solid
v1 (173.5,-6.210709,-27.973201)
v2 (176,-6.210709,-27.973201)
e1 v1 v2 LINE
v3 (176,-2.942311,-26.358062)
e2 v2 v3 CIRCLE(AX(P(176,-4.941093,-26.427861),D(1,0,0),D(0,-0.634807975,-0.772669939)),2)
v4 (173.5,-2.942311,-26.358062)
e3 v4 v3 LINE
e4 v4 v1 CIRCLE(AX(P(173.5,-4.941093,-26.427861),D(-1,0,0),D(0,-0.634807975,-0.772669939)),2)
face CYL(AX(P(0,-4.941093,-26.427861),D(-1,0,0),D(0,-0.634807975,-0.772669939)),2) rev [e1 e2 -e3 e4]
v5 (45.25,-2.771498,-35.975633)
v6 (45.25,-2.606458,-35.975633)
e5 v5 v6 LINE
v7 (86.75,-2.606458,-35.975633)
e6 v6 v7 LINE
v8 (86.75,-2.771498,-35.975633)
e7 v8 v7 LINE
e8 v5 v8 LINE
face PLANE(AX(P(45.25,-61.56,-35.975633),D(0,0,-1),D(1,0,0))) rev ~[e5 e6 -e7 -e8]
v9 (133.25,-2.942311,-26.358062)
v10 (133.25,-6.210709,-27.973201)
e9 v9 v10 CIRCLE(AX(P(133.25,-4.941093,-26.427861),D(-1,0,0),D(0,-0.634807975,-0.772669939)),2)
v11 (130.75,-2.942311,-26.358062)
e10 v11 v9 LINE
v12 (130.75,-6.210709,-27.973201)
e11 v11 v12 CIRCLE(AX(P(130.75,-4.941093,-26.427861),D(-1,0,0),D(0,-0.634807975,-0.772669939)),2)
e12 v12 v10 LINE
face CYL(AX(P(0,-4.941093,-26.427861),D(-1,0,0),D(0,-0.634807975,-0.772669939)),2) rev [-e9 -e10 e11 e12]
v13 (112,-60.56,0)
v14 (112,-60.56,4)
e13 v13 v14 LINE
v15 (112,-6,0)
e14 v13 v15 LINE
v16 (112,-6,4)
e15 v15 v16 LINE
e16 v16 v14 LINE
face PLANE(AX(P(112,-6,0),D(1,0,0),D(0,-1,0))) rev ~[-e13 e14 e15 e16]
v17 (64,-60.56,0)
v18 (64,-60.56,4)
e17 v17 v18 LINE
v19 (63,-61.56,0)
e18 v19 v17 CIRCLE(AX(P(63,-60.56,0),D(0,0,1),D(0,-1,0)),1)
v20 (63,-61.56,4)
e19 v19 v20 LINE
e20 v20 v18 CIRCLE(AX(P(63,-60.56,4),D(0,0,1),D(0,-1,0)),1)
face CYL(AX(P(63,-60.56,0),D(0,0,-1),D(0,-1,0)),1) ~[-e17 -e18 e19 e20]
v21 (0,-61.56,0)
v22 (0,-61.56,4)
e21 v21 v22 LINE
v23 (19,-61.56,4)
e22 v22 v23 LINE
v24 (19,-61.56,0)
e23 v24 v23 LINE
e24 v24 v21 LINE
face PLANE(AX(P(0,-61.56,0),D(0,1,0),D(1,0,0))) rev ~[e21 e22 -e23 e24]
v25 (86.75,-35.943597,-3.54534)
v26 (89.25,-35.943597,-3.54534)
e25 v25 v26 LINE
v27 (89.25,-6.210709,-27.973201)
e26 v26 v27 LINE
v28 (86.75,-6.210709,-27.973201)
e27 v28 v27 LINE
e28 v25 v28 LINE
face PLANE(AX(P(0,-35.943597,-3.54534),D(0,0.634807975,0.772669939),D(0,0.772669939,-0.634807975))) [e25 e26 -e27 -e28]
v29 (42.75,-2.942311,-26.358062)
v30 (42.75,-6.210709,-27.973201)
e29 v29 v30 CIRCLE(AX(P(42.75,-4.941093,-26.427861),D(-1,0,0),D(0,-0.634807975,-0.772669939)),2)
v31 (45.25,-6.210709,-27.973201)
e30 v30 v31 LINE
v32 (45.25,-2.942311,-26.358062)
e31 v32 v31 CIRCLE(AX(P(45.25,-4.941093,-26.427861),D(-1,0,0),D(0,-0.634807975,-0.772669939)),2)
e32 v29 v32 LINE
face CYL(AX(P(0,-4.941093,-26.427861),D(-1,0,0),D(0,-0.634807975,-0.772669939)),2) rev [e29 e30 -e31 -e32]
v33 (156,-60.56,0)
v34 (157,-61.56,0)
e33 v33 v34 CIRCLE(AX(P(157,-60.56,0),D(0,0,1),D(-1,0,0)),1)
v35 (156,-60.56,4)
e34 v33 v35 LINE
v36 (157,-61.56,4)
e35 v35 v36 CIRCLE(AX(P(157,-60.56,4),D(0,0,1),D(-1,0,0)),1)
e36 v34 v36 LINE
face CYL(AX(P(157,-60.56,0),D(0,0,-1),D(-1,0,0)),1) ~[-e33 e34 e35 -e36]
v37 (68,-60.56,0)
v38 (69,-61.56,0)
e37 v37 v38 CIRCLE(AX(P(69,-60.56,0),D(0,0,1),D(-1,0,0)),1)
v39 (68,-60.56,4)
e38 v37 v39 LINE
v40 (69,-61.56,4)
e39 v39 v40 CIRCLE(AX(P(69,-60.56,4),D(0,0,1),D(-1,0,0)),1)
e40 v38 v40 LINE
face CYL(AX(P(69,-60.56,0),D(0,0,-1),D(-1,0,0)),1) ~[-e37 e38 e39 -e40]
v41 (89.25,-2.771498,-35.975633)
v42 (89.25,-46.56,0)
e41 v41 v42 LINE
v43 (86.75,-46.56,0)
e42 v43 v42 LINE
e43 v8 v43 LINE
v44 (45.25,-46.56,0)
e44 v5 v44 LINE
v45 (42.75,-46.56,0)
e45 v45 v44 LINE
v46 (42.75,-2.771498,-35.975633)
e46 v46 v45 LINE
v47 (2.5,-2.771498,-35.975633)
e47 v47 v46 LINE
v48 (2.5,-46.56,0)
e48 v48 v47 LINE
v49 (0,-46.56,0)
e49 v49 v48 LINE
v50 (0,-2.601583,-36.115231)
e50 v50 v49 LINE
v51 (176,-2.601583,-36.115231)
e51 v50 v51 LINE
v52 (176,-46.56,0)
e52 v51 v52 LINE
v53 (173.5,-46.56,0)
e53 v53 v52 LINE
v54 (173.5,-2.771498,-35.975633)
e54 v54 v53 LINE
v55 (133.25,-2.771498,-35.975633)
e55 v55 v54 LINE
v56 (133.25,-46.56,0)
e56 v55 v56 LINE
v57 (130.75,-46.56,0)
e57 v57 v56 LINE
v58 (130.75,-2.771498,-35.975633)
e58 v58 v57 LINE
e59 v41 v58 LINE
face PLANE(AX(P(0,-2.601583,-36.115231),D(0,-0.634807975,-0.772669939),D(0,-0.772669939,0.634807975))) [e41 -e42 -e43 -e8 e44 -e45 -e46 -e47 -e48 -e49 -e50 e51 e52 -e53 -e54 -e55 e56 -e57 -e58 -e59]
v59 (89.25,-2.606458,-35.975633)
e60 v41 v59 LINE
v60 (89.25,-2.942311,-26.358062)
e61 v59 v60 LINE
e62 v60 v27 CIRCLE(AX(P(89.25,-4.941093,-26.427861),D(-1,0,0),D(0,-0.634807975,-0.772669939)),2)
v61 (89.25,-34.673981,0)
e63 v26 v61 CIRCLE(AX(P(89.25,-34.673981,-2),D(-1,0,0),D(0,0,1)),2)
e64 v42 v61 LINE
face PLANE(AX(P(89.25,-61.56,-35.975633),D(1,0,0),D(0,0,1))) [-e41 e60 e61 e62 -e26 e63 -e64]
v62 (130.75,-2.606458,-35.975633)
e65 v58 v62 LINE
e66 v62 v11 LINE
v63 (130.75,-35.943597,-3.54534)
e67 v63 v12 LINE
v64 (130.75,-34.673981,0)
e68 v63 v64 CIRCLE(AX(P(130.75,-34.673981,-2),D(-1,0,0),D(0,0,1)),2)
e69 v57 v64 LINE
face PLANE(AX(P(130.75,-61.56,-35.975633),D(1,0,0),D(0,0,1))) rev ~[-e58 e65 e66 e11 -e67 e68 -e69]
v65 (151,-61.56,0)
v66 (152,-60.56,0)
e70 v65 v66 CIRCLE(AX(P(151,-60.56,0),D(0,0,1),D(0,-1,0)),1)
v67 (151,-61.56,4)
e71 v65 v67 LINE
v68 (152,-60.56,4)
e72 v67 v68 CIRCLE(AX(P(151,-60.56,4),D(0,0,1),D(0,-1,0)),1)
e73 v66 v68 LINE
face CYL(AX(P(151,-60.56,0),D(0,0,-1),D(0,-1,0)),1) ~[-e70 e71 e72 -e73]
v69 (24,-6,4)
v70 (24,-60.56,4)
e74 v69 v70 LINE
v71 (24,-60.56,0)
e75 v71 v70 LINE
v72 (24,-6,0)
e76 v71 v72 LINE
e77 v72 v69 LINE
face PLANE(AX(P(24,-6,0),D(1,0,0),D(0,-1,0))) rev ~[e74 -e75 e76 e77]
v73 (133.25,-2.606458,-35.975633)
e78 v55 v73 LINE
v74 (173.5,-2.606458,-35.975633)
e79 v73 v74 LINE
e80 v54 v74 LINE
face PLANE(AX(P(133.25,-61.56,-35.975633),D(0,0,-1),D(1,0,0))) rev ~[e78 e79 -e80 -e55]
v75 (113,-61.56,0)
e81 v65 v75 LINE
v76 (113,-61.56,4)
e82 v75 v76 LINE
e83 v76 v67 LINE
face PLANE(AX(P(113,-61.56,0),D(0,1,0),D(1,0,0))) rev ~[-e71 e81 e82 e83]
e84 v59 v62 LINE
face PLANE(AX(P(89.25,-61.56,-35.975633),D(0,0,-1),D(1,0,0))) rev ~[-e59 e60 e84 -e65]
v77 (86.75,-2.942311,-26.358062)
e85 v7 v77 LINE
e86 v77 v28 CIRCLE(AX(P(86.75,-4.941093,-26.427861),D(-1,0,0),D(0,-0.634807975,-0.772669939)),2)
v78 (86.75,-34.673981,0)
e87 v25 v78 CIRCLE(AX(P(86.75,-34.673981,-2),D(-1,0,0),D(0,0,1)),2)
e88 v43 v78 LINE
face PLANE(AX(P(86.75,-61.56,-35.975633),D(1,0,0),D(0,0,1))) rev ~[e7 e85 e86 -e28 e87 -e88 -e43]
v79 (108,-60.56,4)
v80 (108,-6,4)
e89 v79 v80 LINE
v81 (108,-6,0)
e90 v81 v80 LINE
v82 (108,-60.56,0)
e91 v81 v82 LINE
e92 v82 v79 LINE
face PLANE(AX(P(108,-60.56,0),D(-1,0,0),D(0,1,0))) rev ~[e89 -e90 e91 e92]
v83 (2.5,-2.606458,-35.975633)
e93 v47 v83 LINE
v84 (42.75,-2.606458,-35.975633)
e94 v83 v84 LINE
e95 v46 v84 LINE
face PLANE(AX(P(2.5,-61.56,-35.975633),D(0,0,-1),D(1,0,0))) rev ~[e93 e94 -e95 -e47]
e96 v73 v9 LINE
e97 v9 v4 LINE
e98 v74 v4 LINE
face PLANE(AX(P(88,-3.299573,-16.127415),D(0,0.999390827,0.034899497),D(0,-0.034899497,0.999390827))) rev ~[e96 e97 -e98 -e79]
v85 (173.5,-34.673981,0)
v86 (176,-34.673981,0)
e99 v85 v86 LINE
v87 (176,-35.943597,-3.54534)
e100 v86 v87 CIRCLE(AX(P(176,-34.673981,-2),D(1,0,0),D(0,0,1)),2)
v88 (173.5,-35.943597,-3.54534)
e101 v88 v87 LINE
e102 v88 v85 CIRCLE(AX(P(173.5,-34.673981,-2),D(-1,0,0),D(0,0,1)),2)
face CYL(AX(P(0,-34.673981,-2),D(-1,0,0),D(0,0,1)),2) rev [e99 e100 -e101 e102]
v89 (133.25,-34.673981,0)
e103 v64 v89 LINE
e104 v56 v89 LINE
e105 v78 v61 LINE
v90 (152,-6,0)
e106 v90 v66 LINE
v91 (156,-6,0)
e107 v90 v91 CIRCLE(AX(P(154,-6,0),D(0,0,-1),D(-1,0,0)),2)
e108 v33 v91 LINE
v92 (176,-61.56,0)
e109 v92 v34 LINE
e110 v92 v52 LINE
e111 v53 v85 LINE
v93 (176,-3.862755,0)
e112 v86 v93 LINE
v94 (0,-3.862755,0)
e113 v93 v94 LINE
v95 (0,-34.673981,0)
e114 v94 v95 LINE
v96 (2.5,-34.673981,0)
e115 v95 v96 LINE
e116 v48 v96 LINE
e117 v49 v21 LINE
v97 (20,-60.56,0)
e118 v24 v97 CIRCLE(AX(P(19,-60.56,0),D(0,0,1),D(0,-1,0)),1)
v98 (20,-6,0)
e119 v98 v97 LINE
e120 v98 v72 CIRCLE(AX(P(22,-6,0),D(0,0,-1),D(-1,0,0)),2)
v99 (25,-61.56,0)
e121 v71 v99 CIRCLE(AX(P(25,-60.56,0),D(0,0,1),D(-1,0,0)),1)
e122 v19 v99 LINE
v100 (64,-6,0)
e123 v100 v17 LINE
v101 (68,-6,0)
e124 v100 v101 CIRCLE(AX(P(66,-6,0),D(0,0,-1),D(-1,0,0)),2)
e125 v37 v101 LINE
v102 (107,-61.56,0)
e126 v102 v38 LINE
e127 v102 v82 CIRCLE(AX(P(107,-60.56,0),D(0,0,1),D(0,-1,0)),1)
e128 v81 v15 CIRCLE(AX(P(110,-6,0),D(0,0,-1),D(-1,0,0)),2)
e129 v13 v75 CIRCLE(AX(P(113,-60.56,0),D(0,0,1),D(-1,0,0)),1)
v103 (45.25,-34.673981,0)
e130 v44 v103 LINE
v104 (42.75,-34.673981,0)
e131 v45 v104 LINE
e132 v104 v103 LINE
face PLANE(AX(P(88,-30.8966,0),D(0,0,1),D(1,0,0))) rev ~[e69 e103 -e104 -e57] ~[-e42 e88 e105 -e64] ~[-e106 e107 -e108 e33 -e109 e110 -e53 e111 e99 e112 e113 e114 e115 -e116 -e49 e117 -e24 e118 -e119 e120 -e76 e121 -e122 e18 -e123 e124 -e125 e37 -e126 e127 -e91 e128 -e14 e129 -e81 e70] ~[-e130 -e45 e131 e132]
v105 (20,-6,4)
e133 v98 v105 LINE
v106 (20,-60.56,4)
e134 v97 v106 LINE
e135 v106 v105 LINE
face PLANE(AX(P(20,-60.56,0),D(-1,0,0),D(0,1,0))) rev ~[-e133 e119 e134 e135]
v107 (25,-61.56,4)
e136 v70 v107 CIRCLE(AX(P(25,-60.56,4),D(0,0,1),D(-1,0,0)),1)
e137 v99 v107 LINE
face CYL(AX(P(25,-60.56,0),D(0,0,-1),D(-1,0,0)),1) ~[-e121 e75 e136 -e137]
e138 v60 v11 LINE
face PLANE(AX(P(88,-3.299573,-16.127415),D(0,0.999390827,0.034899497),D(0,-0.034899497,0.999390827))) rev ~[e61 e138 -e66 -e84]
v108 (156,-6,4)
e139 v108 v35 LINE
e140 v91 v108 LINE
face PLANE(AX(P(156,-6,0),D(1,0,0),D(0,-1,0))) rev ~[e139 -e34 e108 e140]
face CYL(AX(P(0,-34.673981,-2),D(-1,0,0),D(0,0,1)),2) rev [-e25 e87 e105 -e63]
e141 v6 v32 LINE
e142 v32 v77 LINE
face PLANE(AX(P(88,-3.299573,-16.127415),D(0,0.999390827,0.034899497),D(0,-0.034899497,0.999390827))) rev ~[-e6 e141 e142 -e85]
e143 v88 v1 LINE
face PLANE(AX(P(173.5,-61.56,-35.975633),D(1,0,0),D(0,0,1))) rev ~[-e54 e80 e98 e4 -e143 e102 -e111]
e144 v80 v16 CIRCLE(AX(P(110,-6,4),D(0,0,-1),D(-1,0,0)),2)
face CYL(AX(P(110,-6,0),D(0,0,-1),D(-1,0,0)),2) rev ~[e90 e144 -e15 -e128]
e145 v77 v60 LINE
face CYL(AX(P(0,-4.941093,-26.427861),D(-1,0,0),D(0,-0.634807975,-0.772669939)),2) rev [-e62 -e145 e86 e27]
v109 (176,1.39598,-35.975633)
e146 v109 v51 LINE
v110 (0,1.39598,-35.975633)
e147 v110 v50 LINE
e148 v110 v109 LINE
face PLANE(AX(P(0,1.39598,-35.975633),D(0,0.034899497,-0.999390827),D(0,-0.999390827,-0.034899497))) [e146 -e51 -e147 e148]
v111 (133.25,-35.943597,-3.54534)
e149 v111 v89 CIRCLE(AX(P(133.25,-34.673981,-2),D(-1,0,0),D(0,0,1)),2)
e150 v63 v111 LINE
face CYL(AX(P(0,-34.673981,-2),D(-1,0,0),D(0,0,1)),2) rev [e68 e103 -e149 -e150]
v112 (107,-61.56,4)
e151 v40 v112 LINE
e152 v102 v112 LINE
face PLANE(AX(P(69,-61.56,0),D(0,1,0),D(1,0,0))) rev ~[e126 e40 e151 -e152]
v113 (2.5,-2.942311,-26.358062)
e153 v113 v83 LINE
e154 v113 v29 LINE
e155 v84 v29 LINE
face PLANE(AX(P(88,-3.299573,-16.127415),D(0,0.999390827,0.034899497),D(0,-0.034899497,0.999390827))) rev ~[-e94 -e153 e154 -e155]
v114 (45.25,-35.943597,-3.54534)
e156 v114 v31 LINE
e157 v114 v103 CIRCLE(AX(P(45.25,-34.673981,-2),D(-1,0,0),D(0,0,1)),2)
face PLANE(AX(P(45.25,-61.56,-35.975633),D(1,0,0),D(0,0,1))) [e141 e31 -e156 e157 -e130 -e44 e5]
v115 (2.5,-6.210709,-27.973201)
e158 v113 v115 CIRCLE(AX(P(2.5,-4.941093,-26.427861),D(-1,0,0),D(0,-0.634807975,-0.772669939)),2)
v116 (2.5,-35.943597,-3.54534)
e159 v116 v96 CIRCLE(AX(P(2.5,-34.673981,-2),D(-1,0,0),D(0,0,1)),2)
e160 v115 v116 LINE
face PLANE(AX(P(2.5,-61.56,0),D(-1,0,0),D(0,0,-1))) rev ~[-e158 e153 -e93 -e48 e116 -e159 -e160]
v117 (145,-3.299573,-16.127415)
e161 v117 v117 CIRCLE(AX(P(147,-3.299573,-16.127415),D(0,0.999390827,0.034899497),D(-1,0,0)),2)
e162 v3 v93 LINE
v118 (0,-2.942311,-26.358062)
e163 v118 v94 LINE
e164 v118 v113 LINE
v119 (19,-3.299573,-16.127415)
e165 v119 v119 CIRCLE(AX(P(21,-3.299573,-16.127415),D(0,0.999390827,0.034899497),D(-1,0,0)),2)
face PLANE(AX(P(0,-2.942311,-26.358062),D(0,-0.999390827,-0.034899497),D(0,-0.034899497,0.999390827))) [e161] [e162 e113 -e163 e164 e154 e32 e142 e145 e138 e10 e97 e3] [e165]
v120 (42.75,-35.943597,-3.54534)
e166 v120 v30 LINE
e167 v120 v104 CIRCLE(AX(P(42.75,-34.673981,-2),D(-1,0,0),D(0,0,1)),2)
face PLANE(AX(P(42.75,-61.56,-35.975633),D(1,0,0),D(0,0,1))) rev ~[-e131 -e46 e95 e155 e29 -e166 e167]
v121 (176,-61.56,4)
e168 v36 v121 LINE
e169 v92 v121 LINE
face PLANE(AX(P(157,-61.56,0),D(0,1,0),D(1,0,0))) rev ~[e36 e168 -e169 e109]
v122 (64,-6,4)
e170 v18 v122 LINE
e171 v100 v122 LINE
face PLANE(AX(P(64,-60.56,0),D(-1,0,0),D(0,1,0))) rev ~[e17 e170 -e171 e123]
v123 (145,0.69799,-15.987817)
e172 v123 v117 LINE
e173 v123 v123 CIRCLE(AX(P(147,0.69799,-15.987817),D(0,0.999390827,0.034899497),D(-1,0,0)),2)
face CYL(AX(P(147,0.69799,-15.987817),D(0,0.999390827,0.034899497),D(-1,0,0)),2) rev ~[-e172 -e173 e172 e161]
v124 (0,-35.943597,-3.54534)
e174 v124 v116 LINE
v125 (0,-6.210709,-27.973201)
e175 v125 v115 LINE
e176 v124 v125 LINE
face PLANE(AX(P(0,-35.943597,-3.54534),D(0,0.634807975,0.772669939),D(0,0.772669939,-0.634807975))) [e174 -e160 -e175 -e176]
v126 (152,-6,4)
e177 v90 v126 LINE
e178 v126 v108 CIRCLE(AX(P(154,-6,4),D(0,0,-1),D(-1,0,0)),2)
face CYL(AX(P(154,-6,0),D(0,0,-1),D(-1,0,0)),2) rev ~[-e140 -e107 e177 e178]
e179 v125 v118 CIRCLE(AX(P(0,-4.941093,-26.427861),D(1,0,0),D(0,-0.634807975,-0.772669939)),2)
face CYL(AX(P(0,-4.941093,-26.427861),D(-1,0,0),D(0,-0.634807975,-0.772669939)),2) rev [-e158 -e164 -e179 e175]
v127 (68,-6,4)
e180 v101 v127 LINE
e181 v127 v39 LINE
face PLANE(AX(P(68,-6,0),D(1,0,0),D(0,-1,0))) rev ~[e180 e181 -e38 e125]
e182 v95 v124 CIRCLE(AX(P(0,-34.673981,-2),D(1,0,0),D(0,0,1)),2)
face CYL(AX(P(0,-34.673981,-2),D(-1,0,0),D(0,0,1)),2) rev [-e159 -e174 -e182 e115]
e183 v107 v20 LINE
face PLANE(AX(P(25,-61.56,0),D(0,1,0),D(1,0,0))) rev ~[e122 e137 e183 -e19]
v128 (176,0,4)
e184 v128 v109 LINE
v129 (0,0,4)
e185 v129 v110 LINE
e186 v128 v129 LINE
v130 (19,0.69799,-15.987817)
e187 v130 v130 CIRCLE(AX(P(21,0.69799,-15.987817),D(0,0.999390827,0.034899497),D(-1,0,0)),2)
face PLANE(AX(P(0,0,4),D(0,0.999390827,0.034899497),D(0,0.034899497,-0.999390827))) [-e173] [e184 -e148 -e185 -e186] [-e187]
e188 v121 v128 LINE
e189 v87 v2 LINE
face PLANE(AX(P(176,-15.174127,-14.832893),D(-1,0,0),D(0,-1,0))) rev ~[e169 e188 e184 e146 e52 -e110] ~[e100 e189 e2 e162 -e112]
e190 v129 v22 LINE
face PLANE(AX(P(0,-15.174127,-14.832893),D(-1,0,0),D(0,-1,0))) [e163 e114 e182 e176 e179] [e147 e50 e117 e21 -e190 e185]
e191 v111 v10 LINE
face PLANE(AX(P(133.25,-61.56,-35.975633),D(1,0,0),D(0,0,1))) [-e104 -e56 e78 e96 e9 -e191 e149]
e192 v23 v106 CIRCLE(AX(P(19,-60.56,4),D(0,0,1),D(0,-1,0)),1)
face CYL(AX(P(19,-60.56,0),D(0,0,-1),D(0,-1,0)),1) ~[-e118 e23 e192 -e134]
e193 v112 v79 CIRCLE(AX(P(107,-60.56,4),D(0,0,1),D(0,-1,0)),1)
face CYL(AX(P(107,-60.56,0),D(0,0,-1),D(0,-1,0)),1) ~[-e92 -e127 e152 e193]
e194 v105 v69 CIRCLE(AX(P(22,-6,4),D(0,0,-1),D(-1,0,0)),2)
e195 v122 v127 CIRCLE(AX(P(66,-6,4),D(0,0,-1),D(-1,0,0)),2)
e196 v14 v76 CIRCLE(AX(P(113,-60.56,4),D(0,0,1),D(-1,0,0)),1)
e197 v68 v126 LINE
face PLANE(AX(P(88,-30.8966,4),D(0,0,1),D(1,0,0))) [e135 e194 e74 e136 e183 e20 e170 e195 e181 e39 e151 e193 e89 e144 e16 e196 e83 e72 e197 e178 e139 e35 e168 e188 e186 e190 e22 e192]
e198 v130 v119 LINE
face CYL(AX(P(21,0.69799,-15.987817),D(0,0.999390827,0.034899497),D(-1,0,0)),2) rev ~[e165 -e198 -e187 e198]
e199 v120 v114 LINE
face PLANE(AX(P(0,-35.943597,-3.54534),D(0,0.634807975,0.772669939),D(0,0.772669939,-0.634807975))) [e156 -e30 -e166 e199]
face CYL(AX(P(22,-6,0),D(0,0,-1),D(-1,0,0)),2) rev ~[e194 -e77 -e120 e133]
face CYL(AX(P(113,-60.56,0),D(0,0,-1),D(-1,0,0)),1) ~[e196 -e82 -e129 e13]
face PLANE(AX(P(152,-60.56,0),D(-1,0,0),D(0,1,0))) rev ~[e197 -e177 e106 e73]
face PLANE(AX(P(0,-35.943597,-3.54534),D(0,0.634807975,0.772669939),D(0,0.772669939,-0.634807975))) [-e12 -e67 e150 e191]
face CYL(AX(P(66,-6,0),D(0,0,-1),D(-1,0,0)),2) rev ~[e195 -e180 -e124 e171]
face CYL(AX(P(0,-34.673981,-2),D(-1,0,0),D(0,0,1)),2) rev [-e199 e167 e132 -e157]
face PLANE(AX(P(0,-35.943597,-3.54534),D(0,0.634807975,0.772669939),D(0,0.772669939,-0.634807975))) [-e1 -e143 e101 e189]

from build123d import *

# Parameters (mm, degrees)
F1_DEPTH = 4
F4_DEPTH = 176
F6_W     = 40.25
F6_H     = 35.9756330808
F6_W_2   = 41.5
F7_REACH = 113.8761797882
F8_R     = 2
F9_DEPTH = 25


# Not quite as in the source:
# - a feature names something its author has since deleted; it is built from what else it names


with BuildPart() as f1:
    # F0 (on Top) → F1 (new body)
    with BuildSketch(Plane.XY):
        with BuildLine():
            Line((176, 0), (0, 0))
            Line((0, 0), (0, -61.56))
            Line((0, -61.56), (19, -61.56))
            ThreePointArc((19, -61.56), (19.7071067812, -61.2671067812), (20, -60.56))
            Line((20, -60.56), (20, -6))
            ThreePointArc((20, -6), (22, -4), (24, -6))
            Line((24, -6), (24, -60.56))
            ThreePointArc((24, -60.56), (24.2928932188, -61.2671067812), (25, -61.56))
            Line((25, -61.56), (63, -61.56))
            ThreePointArc((63, -61.56), (63.7071067812, -61.2671067812), (64, -60.56))
            Line((64, -60.56), (64, -6))
            ThreePointArc((64, -6), (66, -4), (68, -6))
            Line((68, -6), (68, -60.56))
            ThreePointArc((68, -60.56), (68.2928932188, -61.2671067812), (69, -61.56))
            Line((69, -61.56), (107, -61.56))
            ThreePointArc((107, -61.56), (107.7071067812, -61.2671067812), (108, -60.56))
            Line((108, -60.56), (108, -6))
            ThreePointArc((108, -6), (110, -4), (112, -6))
            Line((112, -6), (112, -60.56))
            ThreePointArc((112, -60.56), (112.2928932188, -61.2671067812), (113, -61.56))
            Line((113, -61.56), (151, -61.56))
            ThreePointArc((151, -61.56), (151.7071067812, -61.2671067812), (152, -60.56))
            Line((152, -60.56), (152, -6))
            ThreePointArc((152, -6), (154, -4), (156, -6))
            Line((156, -6), (156, -60.56))
            ThreePointArc((156, -60.56), (156.2928932188, -61.2671067812), (157, -61.56))
            Line((157, -61.56), (176, -61.56))
            Line((176, -61.56), (176, 0))
        make_face()
    extrude(amount=F1_DEPTH)

    # F3 (on face) → F4 (join, through all)
    with BuildSketch(Plane(origin=(0, 0, 0), x_dir=(0, -1, 0), z_dir=(-1, 0, 0))):
        with BuildLine():
            Line((2.9423112754, -26.3580624732), (3.8627550992, 0))
            Line((3.8627550992, 0), (0, 0))
            Line((0, 0), (0, 4))
            Line((0, 4), (-1.3959798681, -35.9756330808))
            Line((-1.3959798681, -35.9756330808), (2.60158344, -36.1152310676))
            Line((2.60158344, -36.1152310676), (46.56, 0))
            Line((46.56, 0), (34.6739806412, 0))
            ThreePointArc((34.6739806412, 0), (36.5568879354, -1.3257151036), (35.9435965909, -3.5453398785))
            Line((35.9435965909, -3.5453398785), (6.2107088791, -27.9732013451))
            ThreePointArc((6.2107088791, -27.9732013451), (4.0550404197, -28.220878742), (2.9423112754, -26.3580624732))
        make_face()
    extrude(amount=-F4_DEPTH)

    f7_end = Plane(origin=(88, -3.299573374, -16.1274145272), x_dir=(0, -0.0348994967, 0.999390827), z_dir=(0, 0.999390827, 0.0348994967))
    # F6 (on face) → F7 (cut, up to a plane its end follows)
    with BuildSketch(Plane.XZ.offset(61.56)):
        with Locations((153.375, -17.9878165404)):
            Rectangle(F6_W, F6_H)
        with Locations((110, -17.9878165404)):
            Rectangle(F6_W_2, F6_H)
        with Locations((66, -17.9878165404)):
            Rectangle(F6_W_2, F6_H)
        Polygon((19, 0), (2.5, 0), (2.5, -35.9756330808), (42.75, -35.9756330808), (42.75, 0), align=None)
    f7_long = extrude(amount=-F7_REACH, mode=Mode.PRIVATE)
    add(split(f7_long, bisect_by=f7_end, keep=Keep.BOTTOM, mode=Mode.PRIVATE), mode=Mode.SUBTRACT)

    # F8 (on face) → F9 (cut)
    with BuildSketch(Plane(origin=(0, 0.1395129475, 0.0048718995), x_dir=(-1, 0, 0), z_dir=(0, 0.999390827, 0.0348994967))):
        with Locations((-147.0000000001, -16.0024366919)):
            Circle(F8_R)
        with Locations((-21, -16.0024366919)):
            Circle(F8_R)
    extrude(amount=-F9_DEPTH, mode=Mode.SUBTRACT)


solid = f1.part
